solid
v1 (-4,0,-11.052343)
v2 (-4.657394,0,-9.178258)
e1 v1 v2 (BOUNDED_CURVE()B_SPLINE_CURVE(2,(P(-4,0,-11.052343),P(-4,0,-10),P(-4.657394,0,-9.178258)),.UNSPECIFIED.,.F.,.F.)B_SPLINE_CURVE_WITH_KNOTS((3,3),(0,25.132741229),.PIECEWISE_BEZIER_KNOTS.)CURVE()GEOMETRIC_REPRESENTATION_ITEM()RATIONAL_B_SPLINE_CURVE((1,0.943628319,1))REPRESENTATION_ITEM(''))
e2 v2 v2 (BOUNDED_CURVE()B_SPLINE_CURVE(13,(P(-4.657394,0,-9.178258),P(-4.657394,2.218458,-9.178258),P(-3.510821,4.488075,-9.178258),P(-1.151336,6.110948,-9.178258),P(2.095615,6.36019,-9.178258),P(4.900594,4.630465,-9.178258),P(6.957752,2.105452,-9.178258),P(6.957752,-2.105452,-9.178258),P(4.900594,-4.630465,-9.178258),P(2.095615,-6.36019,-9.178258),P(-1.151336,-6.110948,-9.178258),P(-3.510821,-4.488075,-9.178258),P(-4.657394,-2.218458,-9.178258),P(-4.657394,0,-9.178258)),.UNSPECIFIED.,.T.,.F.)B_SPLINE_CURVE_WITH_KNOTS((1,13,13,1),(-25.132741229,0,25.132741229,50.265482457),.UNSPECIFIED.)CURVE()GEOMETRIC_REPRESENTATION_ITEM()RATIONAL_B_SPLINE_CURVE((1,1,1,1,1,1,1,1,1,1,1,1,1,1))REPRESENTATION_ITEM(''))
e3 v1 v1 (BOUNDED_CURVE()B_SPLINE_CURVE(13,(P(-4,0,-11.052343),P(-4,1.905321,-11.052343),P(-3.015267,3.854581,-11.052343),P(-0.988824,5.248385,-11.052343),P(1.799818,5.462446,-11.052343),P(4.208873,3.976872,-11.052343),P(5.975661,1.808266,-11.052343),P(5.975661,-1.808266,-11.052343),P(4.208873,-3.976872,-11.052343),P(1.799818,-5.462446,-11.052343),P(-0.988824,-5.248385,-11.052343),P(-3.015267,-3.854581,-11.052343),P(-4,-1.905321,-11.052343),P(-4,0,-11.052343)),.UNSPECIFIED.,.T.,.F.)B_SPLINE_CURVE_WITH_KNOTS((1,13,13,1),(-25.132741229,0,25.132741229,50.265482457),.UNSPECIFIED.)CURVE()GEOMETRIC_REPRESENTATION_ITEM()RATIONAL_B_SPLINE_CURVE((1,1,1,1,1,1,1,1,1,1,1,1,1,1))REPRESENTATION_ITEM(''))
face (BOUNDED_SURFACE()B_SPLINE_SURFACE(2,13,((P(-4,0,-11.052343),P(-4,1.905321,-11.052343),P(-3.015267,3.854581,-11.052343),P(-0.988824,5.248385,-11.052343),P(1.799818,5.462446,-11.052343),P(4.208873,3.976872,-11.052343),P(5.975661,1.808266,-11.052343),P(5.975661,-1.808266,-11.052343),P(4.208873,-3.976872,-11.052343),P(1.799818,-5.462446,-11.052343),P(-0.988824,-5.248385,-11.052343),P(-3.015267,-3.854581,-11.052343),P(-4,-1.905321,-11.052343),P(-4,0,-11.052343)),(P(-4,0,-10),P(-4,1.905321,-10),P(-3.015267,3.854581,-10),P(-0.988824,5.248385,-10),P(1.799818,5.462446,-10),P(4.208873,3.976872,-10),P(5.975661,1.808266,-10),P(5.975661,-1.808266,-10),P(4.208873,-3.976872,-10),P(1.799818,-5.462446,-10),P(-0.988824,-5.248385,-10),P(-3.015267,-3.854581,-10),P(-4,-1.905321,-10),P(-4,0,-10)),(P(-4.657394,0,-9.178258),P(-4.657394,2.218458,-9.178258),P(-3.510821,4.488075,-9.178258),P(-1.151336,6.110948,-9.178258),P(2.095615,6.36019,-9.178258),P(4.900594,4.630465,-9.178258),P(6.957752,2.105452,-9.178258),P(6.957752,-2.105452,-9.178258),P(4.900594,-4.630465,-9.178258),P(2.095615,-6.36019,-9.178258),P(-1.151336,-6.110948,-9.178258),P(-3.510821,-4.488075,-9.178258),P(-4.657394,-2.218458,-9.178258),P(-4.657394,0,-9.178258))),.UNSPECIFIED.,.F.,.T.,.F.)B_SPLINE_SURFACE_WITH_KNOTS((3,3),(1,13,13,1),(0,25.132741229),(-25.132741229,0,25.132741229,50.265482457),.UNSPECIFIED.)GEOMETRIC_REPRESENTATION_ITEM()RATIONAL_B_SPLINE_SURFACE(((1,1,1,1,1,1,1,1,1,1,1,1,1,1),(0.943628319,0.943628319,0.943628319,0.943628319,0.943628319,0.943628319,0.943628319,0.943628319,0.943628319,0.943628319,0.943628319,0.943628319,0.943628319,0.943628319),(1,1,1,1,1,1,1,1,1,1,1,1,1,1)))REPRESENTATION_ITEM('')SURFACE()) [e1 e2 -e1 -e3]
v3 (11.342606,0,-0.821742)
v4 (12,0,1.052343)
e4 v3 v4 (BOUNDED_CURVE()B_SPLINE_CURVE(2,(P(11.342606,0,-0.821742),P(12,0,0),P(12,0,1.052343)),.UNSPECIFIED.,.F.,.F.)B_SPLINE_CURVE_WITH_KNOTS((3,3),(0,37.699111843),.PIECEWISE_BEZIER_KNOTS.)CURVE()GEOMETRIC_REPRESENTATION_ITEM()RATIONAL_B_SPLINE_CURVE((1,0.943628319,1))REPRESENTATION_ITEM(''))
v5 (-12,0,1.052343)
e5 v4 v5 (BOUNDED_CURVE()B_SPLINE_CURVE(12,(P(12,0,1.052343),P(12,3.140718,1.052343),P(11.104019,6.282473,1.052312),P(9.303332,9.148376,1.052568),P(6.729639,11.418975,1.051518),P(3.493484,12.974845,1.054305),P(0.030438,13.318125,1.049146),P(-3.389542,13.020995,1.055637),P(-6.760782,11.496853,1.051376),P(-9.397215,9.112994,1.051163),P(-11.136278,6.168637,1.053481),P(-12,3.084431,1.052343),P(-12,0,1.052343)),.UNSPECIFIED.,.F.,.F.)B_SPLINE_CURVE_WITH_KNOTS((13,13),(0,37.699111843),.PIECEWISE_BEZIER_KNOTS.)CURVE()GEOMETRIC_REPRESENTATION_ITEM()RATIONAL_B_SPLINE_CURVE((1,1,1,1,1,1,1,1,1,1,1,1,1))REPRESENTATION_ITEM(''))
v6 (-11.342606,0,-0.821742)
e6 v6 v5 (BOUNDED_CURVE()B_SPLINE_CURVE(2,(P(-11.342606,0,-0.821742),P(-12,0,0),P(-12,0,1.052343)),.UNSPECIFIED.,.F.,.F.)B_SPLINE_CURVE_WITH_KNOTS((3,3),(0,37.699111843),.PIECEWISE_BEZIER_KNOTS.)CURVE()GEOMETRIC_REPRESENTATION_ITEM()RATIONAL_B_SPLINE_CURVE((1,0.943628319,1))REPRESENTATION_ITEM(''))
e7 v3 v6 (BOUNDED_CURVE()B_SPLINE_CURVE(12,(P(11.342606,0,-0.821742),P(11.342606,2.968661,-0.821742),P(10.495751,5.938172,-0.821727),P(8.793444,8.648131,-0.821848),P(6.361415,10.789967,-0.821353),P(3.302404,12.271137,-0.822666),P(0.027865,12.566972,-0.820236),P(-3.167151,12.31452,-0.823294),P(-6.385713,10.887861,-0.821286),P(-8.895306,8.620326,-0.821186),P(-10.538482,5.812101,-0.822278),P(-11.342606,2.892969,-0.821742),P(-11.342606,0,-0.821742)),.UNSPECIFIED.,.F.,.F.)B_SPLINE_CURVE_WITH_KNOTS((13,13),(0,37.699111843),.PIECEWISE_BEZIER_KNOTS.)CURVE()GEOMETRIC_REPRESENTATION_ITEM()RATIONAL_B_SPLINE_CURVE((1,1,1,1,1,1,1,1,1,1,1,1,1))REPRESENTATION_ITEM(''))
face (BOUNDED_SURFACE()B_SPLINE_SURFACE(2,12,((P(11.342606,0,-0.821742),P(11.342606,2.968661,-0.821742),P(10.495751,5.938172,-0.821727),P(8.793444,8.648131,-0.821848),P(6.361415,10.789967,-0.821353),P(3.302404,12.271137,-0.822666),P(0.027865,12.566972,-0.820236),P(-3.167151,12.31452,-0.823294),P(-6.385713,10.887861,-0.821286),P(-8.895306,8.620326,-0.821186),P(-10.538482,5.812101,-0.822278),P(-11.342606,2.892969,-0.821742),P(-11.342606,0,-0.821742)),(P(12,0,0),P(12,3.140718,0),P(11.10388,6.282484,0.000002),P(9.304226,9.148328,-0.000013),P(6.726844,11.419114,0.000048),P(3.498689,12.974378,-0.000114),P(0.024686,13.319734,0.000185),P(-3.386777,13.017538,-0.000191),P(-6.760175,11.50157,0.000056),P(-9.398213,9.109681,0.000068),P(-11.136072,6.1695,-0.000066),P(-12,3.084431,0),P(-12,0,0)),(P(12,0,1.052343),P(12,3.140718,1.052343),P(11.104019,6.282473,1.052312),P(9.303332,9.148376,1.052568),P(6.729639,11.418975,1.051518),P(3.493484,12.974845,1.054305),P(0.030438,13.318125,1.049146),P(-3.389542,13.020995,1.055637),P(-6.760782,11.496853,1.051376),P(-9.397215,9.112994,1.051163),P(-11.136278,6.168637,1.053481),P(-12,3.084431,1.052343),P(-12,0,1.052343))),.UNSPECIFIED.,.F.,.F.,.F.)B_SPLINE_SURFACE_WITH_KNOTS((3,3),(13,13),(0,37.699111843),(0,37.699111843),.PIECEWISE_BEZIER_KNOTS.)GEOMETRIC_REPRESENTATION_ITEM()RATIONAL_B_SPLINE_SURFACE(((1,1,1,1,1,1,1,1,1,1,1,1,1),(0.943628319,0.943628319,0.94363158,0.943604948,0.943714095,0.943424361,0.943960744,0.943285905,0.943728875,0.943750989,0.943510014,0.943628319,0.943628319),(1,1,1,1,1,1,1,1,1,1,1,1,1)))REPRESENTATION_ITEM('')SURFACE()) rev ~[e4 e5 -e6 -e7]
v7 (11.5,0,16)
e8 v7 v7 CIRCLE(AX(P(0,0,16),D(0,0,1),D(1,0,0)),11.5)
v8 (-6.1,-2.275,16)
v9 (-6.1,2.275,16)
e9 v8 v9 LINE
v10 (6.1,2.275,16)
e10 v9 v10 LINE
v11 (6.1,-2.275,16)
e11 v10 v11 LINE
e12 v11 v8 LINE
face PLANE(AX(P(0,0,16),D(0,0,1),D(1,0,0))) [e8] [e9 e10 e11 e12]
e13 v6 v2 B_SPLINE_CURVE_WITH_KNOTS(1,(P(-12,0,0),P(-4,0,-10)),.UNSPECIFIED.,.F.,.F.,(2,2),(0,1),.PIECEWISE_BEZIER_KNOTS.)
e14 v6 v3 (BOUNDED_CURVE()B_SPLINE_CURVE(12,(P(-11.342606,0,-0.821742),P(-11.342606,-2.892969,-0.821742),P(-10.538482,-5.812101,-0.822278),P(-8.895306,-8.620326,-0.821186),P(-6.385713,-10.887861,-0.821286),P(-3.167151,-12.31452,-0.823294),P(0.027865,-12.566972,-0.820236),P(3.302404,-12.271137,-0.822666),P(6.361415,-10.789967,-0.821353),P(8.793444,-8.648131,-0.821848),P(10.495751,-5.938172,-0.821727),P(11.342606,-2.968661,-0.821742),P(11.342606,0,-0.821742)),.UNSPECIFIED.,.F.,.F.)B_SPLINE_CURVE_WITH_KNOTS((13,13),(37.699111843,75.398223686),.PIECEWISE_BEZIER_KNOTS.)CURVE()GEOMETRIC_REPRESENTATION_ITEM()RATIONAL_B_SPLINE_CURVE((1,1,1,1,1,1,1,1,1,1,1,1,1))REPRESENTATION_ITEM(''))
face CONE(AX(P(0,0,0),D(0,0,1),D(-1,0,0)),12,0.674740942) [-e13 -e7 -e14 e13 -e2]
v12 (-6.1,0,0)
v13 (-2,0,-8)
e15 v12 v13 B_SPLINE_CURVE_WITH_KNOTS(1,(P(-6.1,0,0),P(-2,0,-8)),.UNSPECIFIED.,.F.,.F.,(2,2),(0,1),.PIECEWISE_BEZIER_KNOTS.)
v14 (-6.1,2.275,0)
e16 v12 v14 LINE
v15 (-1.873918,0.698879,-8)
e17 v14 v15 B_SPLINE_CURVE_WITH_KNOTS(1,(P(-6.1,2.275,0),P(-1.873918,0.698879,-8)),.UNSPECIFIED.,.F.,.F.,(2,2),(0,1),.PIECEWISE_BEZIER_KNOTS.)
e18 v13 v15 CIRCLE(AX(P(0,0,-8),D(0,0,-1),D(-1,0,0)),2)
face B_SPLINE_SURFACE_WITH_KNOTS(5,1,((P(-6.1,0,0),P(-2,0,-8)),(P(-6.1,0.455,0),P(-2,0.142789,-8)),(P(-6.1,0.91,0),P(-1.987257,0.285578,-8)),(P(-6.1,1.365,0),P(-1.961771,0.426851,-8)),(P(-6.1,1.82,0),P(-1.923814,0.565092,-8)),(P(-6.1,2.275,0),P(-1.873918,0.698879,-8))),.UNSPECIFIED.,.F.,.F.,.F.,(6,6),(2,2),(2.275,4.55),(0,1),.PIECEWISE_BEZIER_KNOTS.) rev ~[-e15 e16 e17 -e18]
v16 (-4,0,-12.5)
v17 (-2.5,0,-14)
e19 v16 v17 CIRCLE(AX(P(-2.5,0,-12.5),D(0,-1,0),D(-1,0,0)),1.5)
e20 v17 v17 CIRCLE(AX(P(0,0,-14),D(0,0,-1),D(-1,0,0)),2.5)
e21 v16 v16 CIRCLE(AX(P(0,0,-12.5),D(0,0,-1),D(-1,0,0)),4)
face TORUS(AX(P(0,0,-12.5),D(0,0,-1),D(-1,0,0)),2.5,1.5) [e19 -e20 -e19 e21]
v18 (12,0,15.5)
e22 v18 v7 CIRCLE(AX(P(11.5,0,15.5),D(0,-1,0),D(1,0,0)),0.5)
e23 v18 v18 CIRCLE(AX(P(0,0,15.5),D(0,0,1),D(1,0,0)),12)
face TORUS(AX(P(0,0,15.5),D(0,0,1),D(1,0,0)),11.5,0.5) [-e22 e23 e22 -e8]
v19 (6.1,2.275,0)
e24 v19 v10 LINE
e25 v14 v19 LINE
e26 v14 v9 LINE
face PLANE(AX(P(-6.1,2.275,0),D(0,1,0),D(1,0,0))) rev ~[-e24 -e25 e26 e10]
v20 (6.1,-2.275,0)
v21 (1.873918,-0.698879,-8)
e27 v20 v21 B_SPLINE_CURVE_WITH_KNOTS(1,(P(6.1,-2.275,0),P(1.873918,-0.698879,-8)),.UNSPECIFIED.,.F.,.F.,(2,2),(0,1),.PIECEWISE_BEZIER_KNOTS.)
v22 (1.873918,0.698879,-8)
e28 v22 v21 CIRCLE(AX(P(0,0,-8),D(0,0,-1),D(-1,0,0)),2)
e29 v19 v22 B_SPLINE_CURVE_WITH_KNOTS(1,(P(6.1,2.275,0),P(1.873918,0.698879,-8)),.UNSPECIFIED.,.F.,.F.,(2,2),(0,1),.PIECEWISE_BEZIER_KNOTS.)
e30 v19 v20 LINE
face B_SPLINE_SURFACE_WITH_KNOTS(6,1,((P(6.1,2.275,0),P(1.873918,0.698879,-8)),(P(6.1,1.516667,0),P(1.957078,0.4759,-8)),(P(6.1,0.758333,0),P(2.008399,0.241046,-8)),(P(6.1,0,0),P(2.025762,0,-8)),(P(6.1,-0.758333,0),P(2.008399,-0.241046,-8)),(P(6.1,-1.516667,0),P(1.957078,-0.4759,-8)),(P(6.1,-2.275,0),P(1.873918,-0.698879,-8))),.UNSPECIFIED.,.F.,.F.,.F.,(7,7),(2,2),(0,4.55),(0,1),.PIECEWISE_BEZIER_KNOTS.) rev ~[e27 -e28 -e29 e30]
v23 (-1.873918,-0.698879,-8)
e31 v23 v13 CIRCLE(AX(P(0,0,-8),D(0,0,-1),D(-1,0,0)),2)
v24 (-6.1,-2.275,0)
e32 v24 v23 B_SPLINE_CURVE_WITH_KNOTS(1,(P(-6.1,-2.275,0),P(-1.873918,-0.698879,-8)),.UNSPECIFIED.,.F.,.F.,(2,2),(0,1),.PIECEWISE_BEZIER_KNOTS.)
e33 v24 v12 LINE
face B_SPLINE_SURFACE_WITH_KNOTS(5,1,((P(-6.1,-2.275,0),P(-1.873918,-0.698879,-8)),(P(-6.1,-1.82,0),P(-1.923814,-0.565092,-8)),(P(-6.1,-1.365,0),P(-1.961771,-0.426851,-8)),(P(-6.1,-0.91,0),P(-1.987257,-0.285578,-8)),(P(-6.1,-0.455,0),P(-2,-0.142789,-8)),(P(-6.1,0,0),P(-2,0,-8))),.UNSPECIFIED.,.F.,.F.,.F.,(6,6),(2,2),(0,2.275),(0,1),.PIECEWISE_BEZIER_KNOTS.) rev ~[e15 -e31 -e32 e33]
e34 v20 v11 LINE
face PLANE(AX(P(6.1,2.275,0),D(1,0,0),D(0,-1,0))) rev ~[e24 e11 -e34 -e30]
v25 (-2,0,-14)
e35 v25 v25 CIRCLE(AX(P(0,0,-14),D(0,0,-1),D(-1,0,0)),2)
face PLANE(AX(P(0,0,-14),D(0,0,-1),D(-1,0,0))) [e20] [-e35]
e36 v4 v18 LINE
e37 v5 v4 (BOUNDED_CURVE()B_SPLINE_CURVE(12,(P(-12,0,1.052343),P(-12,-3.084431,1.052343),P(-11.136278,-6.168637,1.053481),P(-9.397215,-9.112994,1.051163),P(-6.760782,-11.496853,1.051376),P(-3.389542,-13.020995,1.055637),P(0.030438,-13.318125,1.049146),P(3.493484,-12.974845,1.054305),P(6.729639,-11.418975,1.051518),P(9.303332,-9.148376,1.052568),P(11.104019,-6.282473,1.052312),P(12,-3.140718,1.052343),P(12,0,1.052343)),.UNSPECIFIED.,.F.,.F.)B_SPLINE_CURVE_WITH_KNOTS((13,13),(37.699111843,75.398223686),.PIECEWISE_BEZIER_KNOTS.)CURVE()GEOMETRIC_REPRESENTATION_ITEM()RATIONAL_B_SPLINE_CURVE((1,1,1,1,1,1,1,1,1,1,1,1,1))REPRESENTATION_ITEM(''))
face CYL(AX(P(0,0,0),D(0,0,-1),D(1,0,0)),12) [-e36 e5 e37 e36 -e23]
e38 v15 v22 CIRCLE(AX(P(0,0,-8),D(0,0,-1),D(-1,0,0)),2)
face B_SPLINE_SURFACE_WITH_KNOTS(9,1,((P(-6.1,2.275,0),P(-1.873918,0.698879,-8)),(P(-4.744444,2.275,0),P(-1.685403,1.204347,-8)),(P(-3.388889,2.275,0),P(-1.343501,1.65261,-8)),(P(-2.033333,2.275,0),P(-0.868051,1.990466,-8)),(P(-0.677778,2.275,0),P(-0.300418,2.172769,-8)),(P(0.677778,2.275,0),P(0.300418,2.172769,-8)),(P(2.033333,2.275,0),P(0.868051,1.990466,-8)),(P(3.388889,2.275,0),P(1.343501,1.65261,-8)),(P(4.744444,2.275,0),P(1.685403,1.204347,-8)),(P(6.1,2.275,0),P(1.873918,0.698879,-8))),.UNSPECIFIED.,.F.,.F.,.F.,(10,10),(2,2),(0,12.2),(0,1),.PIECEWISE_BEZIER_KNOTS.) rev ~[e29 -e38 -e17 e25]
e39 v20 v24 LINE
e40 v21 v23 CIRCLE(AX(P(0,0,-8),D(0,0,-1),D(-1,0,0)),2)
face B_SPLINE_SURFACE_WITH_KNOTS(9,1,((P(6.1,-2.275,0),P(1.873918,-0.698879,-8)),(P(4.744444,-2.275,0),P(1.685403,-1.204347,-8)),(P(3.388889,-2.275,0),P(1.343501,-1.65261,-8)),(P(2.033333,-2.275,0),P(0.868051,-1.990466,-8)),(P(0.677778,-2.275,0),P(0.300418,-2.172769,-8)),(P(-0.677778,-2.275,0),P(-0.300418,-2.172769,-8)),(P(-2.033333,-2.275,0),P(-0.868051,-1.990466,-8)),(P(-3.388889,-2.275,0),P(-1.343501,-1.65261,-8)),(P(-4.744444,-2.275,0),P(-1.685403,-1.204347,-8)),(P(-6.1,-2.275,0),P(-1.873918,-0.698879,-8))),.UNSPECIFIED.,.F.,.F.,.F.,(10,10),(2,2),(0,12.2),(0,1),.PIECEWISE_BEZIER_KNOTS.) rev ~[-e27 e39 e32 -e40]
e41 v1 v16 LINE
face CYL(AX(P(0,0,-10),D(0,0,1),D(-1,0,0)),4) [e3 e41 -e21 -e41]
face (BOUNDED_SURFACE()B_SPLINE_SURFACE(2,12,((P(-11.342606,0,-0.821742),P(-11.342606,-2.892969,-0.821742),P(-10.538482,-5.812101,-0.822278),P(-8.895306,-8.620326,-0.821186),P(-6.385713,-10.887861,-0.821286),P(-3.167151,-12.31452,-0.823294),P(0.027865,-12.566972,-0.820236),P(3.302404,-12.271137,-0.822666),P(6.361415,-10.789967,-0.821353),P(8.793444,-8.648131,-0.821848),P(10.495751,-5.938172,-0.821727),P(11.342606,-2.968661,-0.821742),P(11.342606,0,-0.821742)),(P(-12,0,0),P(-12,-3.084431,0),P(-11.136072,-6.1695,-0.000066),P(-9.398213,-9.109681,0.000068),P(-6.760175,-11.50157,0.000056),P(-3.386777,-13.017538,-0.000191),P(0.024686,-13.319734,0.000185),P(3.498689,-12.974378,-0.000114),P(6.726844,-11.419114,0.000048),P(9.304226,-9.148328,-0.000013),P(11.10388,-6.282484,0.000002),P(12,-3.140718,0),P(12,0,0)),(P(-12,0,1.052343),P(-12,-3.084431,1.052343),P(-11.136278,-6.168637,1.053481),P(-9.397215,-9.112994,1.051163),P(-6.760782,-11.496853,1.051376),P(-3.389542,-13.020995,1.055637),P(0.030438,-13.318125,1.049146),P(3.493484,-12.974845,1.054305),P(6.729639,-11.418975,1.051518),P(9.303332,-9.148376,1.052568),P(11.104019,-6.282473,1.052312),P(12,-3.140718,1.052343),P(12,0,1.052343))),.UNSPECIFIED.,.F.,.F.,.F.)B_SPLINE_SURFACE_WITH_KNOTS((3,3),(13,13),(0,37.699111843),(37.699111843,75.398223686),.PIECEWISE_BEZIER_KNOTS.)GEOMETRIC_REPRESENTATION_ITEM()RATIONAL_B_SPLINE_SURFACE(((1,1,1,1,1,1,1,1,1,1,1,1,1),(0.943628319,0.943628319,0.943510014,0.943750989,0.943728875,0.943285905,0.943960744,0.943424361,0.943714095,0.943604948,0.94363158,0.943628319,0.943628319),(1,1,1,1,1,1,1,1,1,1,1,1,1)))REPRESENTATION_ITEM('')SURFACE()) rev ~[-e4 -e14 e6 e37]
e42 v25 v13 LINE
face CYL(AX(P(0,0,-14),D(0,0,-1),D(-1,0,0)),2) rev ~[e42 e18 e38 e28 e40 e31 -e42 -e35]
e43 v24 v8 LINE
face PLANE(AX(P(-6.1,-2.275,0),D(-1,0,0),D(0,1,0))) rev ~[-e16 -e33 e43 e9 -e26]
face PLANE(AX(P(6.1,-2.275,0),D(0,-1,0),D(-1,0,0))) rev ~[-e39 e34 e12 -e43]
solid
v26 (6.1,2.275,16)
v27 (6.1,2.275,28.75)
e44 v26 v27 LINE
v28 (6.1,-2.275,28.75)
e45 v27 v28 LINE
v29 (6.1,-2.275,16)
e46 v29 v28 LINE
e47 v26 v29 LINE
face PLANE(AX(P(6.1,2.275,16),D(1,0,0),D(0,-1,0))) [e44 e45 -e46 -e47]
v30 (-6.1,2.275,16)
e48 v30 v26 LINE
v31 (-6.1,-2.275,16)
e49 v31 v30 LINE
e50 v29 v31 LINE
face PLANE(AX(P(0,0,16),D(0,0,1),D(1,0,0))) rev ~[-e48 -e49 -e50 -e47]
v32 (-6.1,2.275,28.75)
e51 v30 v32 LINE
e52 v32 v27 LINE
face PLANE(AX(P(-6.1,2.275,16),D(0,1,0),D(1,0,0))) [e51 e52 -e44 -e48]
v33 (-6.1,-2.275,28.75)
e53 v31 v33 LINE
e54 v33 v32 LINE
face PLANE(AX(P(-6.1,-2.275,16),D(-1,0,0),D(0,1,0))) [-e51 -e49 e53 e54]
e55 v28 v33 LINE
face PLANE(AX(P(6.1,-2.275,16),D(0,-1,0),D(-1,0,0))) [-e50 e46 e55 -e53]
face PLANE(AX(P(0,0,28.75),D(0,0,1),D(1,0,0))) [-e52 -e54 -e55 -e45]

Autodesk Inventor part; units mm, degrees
ref_plane "YZ Plane" through (0, 0, 0) normal (1, 0, 0) x (0, 1, 0)
ref_plane "XZ Plane" through (0, 0, 0) normal (0, 1, 0) x (-1, 0, 0)
ref_plane "XY Plane" through (0, 0, 0) normal (0, 0, 1) x (1, 0, 0)
sketch "Sketch1" plane through (0, 0, 0) normal (0, 0, 1) x (1, 0, 0)
  circle A0 centre (0, 0) radius 12
  line L0 (-6.1, 2.275) -> (6.1, 2.275)
  line L1 (6.1, 2.275) -> (6.1, -2.275)
  line L2 (6.1, -2.275) -> (-6.1, -2.275)
  line L3 (-6.1, -2.275) -> (-6.1, 2.275)
  dimension "d0" = 12.2
  dimension "d1" = 4.55
  dimension "d2" = 2.275
  dimension "d3" = 6.1
  dimension "d4" = 24
extrude "Extrusion1" add sketch "Sketch1" along normal blind 16
ref_plane "Work Plane1" through (0, 0, -10) normal (0, 0, -1) x (-1, 0, 0)
sketch "Sketch4" plane through (0, 0, -10) normal (0, 0, -1) x (-1, 0, 0)
  circle A0 centre (0, 0) radius 4
  dimension "d11" = 8
extrude "Extrusion3" add sketch "Sketch4" along normal blind 4
sketch "Sketch6" plane through (0, 0, 0) normal (0, 0, -1) x (-1, 0, 0)
  circle A0 centre (0, 0) radius 12
loft "Loft1" add profiles "Sketch6" section 2 edges at (4, 0, -10)
sketch "Sketch7" plane through (0, 0, -14) normal (0, 0, -1) x (-1, 0, 0)
  circle A0 centre (0, 0) radius 4 projected
  circle A1 centre (0, 0) radius 2
  dimension "d18" = 4
extrude "Extrusion4" cut sketch "Sketch7" against normal blind 6 contours A1
loft "Loft2" cut section 1 edges at (-6.1, 0, 0) (0, -2.275, 0) (6.1, 0, 0) (0, 2.275, 0) section 2 edges at (2, 0, -8)
fillet "Fillet1" radius 1.5 1 edges at (4, 0, -14)
fillet "Fillet2" radius 3 1 edges at (4, 0, -10)
fillet "Fillet3" radius 3 2 edges at (0, 12, 0) (0, -12, 0)
fillet "Fillet4" radius 0.5 1 edges at (-12, 0, 16)
sketch "Sketch8" plane through (0, 0, 16) normal (0, 0, 1) x (1, 0, 0)
  line L0 (-6.1, 2.275) -> (6.1, 2.275) projected
  line L1 (6.1, -2.275) -> (-6.1, -2.275) projected
  line L2 (-6.1, 2.275) -> (6.1, 2.275)
  line L3 (6.1, 2.275) -> (6.1, -2.275)
  line L4 (6.1, -2.275) -> (-6.1, -2.275)
  line L5 (-6.1, -2.275) -> (-6.1, 2.275)
  point P0 (0, 0)
  point P1 (-6.1, -2.275)
extrude "Extrusion5" add sketch "Sketch8" along normal blind 12.75
equation "\"d2\" = 0.5 * d1"
equation "\"d3\" = 0.5 * d0"
properties part number "MainHousing_DataPlug"
